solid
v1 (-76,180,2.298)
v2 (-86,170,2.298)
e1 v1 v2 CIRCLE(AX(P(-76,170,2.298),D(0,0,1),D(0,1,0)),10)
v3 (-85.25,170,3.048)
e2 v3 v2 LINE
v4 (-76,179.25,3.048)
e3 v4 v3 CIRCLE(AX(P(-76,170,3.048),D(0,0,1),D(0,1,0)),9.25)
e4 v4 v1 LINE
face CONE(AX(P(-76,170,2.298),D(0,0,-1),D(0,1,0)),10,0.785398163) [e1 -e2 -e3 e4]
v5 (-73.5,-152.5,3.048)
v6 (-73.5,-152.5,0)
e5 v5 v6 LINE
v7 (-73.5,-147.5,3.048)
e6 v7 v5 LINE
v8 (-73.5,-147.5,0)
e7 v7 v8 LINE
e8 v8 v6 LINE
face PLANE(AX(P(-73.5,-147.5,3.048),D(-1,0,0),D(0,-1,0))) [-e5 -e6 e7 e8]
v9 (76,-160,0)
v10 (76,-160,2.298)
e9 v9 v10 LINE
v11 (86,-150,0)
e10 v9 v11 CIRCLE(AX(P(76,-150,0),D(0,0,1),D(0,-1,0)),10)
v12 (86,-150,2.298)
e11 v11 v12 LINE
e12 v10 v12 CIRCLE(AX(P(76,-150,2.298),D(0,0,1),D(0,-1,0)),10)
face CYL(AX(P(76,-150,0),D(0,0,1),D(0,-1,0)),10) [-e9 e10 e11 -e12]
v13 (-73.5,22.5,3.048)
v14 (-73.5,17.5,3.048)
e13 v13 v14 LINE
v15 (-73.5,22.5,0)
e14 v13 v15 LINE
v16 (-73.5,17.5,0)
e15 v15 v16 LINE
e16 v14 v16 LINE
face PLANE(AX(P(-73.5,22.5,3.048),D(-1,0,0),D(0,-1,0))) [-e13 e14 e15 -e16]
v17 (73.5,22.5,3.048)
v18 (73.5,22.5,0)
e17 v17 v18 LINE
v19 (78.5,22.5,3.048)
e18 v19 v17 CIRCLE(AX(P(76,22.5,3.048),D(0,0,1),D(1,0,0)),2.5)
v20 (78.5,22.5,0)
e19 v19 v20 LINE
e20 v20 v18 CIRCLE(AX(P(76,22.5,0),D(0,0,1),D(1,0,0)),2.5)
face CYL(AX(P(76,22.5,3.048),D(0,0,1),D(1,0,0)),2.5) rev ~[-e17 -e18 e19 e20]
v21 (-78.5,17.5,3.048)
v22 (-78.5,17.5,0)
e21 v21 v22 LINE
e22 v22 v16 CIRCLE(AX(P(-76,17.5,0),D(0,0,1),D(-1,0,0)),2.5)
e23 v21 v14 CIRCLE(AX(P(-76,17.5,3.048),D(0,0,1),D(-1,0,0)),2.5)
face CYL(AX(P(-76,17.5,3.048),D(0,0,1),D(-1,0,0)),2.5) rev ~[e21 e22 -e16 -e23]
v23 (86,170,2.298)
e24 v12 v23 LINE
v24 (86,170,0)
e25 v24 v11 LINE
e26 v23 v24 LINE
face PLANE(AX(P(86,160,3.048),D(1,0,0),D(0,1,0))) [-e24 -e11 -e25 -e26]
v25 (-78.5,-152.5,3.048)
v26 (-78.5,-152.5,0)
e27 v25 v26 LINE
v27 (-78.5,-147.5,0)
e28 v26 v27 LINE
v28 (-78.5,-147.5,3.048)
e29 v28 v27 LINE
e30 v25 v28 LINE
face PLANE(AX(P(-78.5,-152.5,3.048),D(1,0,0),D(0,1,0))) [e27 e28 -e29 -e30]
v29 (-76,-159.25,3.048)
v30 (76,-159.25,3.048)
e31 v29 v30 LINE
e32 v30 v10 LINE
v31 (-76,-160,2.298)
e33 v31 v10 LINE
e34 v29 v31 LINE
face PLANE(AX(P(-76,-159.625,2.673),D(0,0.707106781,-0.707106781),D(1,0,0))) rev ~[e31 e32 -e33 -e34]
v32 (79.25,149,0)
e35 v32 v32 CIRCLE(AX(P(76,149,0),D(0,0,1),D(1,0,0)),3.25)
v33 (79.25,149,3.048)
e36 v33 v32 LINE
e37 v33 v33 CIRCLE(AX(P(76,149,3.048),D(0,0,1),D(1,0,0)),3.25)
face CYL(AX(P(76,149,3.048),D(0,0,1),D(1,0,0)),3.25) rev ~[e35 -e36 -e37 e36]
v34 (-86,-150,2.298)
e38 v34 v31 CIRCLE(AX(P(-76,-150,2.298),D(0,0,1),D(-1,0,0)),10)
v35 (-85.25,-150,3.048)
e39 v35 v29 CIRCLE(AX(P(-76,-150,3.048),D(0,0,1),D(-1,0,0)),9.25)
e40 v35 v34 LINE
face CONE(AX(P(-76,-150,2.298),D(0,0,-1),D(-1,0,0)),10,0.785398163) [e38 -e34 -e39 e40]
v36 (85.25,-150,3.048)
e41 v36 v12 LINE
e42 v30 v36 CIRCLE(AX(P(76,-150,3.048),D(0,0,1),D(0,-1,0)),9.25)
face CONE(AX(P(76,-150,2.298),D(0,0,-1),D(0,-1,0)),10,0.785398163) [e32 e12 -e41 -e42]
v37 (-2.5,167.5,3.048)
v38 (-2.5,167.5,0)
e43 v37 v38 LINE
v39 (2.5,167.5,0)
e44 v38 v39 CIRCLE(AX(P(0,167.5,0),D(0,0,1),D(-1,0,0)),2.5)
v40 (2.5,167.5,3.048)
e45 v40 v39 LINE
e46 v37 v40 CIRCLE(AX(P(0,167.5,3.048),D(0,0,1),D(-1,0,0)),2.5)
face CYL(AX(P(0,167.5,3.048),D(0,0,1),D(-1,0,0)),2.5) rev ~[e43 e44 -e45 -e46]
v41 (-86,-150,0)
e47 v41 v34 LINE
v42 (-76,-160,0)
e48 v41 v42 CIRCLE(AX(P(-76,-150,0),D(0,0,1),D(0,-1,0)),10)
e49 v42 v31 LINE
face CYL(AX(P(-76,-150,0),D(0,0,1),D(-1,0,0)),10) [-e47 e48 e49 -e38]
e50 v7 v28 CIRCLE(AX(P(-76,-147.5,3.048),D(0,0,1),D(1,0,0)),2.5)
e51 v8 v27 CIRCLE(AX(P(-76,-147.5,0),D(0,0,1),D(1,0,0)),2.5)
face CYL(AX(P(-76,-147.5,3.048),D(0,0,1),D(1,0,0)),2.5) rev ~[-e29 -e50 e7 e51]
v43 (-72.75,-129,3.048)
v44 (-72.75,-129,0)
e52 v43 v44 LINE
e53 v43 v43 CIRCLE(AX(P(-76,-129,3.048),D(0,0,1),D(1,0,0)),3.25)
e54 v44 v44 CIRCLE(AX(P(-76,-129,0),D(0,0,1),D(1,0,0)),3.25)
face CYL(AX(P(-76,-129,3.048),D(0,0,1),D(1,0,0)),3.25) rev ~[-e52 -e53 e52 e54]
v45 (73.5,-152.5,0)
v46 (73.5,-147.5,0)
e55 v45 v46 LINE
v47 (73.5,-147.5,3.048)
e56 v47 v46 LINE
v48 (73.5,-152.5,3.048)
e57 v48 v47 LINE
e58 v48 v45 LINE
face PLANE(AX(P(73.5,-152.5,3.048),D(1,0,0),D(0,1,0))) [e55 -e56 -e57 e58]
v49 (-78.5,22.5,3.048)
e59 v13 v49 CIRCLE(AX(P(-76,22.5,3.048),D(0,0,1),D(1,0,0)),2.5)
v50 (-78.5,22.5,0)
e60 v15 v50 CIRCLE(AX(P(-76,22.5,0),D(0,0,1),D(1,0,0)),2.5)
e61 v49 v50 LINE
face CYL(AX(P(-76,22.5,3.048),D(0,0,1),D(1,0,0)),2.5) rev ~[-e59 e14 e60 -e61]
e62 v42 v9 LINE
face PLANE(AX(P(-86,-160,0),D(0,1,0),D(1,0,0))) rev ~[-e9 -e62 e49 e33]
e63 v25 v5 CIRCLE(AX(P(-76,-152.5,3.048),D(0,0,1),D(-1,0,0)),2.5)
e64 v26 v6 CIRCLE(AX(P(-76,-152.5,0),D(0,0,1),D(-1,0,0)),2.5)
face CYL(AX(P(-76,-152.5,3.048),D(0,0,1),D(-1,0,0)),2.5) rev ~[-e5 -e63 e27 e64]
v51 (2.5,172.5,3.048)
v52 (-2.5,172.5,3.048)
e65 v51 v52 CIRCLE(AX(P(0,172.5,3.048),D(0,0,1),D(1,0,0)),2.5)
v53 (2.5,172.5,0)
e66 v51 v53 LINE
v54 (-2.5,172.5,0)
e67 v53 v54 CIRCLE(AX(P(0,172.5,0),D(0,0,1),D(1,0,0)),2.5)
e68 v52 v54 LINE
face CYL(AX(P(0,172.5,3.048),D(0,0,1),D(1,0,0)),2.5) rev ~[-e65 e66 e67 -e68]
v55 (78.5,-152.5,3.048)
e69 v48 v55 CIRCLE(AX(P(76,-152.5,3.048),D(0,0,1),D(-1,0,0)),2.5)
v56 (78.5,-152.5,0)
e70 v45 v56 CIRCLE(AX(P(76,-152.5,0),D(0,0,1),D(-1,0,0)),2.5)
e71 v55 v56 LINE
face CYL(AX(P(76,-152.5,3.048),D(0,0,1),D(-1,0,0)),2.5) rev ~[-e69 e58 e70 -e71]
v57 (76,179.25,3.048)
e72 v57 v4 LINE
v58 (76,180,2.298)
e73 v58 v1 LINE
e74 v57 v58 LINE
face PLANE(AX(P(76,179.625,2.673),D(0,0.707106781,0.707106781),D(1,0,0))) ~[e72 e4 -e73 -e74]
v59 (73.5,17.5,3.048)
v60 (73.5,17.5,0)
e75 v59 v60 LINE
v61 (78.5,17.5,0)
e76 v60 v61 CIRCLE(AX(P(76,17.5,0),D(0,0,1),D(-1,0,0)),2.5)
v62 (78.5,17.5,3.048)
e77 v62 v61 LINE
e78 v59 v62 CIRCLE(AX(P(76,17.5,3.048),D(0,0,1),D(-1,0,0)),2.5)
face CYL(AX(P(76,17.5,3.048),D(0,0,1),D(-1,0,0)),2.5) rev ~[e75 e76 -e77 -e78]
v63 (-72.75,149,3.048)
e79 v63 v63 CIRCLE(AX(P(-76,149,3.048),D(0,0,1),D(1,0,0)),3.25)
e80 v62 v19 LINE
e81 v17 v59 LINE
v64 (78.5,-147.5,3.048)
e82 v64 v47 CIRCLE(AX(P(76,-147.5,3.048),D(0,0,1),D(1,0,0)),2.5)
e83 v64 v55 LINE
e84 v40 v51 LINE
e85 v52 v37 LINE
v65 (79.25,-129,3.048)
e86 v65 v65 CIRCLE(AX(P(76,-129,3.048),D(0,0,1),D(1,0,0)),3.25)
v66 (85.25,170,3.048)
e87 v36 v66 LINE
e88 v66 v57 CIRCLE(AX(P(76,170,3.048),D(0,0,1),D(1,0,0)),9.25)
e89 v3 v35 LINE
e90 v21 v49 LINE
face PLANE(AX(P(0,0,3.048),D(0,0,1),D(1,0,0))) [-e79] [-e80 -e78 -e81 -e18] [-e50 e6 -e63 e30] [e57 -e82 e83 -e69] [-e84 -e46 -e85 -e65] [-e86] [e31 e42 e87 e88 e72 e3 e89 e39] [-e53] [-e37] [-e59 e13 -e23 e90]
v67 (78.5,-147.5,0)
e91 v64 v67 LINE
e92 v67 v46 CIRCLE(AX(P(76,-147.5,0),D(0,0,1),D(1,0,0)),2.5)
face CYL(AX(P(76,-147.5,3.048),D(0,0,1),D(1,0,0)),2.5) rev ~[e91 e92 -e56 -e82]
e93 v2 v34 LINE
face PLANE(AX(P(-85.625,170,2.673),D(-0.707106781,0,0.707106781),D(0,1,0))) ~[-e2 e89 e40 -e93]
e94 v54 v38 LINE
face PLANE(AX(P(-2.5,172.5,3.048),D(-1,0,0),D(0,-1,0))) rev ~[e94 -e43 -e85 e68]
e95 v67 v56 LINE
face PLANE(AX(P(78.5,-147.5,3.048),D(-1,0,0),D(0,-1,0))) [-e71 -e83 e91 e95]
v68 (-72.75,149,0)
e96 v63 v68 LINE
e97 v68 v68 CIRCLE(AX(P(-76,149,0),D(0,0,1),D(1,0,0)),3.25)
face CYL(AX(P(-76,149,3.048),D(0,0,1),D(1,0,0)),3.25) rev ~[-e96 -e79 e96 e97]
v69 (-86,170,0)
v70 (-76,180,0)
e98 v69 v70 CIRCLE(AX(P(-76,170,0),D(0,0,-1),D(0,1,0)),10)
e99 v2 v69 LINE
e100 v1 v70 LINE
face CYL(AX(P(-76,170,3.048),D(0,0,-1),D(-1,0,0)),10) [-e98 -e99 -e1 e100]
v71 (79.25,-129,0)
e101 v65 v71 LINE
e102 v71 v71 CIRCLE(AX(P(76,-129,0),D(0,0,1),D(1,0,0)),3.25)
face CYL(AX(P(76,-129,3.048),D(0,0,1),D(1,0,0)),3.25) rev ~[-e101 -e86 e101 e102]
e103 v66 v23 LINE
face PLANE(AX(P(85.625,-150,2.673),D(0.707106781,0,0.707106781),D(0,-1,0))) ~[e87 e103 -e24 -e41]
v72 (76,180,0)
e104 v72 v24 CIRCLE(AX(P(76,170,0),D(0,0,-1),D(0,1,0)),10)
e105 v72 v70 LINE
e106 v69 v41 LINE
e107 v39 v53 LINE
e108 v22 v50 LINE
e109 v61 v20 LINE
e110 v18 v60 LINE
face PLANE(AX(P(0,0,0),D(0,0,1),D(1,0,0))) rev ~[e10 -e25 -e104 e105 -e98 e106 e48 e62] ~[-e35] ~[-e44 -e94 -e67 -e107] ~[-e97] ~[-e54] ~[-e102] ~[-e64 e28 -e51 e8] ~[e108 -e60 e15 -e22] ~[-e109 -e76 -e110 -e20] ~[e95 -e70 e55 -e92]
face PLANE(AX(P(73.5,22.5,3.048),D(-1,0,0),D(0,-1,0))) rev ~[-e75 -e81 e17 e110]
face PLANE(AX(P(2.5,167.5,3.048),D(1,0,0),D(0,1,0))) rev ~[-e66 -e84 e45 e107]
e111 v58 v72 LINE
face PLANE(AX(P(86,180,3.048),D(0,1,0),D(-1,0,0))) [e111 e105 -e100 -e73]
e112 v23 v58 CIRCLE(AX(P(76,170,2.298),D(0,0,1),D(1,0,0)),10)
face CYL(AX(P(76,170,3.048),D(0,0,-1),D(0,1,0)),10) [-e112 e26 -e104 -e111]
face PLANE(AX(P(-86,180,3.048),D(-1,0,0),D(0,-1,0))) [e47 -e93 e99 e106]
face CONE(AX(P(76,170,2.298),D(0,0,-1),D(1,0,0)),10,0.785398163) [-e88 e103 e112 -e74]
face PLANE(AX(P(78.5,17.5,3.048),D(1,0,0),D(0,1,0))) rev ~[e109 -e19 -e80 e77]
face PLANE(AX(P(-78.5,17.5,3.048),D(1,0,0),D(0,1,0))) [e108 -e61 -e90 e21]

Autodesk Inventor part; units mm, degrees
ref_plane "YZ Plane" through (0, 0, 0) normal (1, 0, 0) x (0, 1, 0)
ref_plane "XZ Plane" through (0, 0, 0) normal (0, 1, 0) x (-1, 0, 0)
sketch "Sketch1" plane through (0, 0, 0) normal (0, 0, 1) x (1, 0, 0)
  line L0 (-86, -160) -> (86, -160)
  line L1 (86, -160) -> (86, 160)
  line L2 (86, 160) -> (-86, 160)
  line L3 (-86, 160) -> (-86, -160)
  line L4 (-86, -160) -> (86, 160) construction
  line L5 (86, -160) -> (-86, 160) construction
  point P0 (0, 0)
  dimension "d0" = 320
  dimension "d1" = 172
extrude "Plate1" add sketch "Sketch1" along normal blind 3.048
sketch "Sketch2" plane through (0, 0, 3.048) normal (0, 0, 1) x (1, 0, 0)
  circle A0 centre (-76, 149) radius 3.25
  line L0 (0, 144.4317) -> (0, -177.0748)
  line L1 (-144.6038, 10) -> (151.531, 10)
  circle A1 centre (76, 149) radius 3.25
  circle A2 centre (-76, -129) radius 3.25
  circle A3 centre (76, -129) radius 3.25
  point P0 (0, 0)
  dimension "d3" = 0
  dimension "d4" = 10
  dimension "d5" = 6.5
  dimension "d6" = 76
  dimension "d7" = 139
extrude "Cut1" cut sketch "Sketch2" against normal blind 3.048
sketch "Sketch3" plane through (0, 0, 3.048) normal (0, 0, 1) x (1, 0, 0)
  line L0 (-76, -152.5) -> (-76, -147.5) construction
  line L1 (-78.5, -152.5) -> (-78.5, -147.5)
  line L2 (-73.5, -147.5) -> (-73.5, -152.5)
  arc A0 (-78.5, -152.5) -> (-73.5, -152.5) centre (-76, -152.5) ccw
  arc A1 (-73.5, -147.5) -> (-78.5, -147.5) centre (-76, -147.5) ccw
  line L3 (76, -152.5) -> (76, -147.5) construction
  line L4 (73.5, -152.5) -> (73.5, -147.5)
  line L5 (78.5, -147.5) -> (78.5, -152.5)
  arc A2 (73.5, -152.5) -> (78.5, -152.5) centre (76, -152.5) ccw
  arc A3 (78.5, -147.5) -> (73.5, -147.5) centre (76, -147.5) ccw
  line L6 (-23.5, 120) -> (-28.5, 120) construction
  line L7 (-23.5, 122.5) -> (-28.5, 122.5) construction
  line L8 (-28.5, 117.5) -> (-23.5, 117.5) construction
  arc A4 (-23.5, 117.5) -> (-23.5, 122.5) centre (-23.5, 120) ccw construction
  arc A5 (-28.5, 122.5) -> (-28.5, 117.5) centre (-28.5, 120) ccw construction
  line L9 (76, 17.5) -> (76, 22.5) construction
  line L10 (78.5, 17.5) -> (78.5, 22.5)
  line L11 (73.5, 22.5) -> (73.5, 17.5)
  arc A6 (73.5, 17.5) -> (78.5, 17.5) centre (76, 17.5) ccw
  arc A7 (78.5, 22.5) -> (73.5, 22.5) centre (76, 22.5) ccw
  line L12 (86, -160) -> (-86, -160) projected
  line L13 (-86, 160) -> (86, 160) projected
  line L14 (-86, -160) -> (-86, 160) projected
  line L15 (-76, 17.5) -> (-76, 22.5) construction
  line L16 (-78.5, 17.5) -> (-78.5, 22.5)
  line L17 (-73.5, 22.5) -> (-73.5, 17.5)
  arc A8 (-78.5, 17.5) -> (-73.5, 17.5) centre (-76, 17.5) ccw
  arc A9 (-73.5, 22.5) -> (-78.5, 22.5) centre (-76, 22.5) ccw
  line L18 (86, 160) -> (86, -160) projected
  point P0 (0, 0)
  point P1 (-76, -150)
  point P2 (76, -150)
  point P3 (-26, 120)
  point P4 (76, 20)
  point P5 (-76, 20)
  dimension "d12" = 10
  dimension "d13" = 10
  dimension "d14" = 170
  dimension "d16" = 40
  dimension "d17" = 0
  dimension "d18" = 60
  dimension "d19" = 170
  dimension "d20" = 0
  dimension "d21" = 5
  dimension "d22" = 5
  dimension "d23" = 5
  dimension "d24" = 5
  dimension "d25" = 5
  dimension "d26" = 2.5
  dimension "d27" = 2.5
  dimension "d28" = 2.5
  dimension "d29" = 2.5
  dimension "d30" = 2.5
  dimension "d33" = 10
  dimension "d34" = 10
extrude "Cut2" cut sketch "Sketch3" against normal blind 3.048 contours L1 A1 L2 A0 | L4 A3 L5 A2 | A6 L11 A7 L10 | L16 A9 L17 A8
ref_plane "Work Plane1" through (86, 160, 0) normal (0, 0.9659258, -0.258819) x (-1, 0, 0)
fillet "Fillet1" radius 10 2 edges at (-86, -160, 1.524) (86, -160, 1.524)
sketch "Sketch7" plane through (0, 0, 3.048) normal (0, 0, 1) x (1, 0, 0)
  line L0 (86, 160) -> (-86, 160)
  line L1 (-86, 160) -> (86, 160)
  line L2 (86, 160) -> (86, 180)
  line L3 (86, 180) -> (-86, 180)
  line L4 (-86, 180) -> (-86, 160)
  point P0 (0, 0)
  dimension "d50" = 20
sheet face with bend "Face4" sketch "Sketch7" thickness 3.048 toward (0, 0, -1) bend radius 3.048
bend "Bend3"
sketch "Sketch8" plane through (0, 0, 3.048) normal (0, 0, 1) x (1, 0, 0)
  line L0 (0, 167.5) -> (0, 172.5) construction
  line L1 (2.5, 167.5) -> (2.5, 172.5)
  line L2 (-2.5, 172.5) -> (-2.5, 167.5)
  arc A0 (-2.5, 167.5) -> (2.5, 167.5) centre (0, 167.5) ccw
  arc A1 (2.5, 172.5) -> (-2.5, 172.5) centre (0, 172.5) ccw
  line L3 (86, 180) -> (-86, 180) projected
  line L4 (86, 180) -> (86, -150) projected
  line L5 (-86, 180) -> (-86, -150) projected
  point P0 (0, 0)
  point P1 (0, 170)
  dimension "d56" = 2.5
  dimension "d57" = 5
  dimension "d58" = 10
  dimension "d59" = 172
  dimension "d60" = 86
extrude "Cut3" cut sketch "Sketch8" against normal blind 3.048
fillet "Corner Round1" radius 10 2 edges at (86, 180, 1.524) (-86, 180, 1.524)
chamfer "Chamfer1" distance 0.75 angle 45 8 edges at (0, -160, 3.048) (-83.0711, -157.0711, 3.048) (-86, 10, 3.048) (-83.0711, 177.0711, 3.048) (0, 180, 3.048) (83.0711, 177.0711, 3.048) (86, 10, 3.048) (83.0711, -157.0711, 3.048)
equation "\"d12\" = d11"
equation "\"d13\" = d11"
equation "\"d22\" = d21"
equation "\"d23\" = d21"
equation "\"d24\" = d21"
equation "\"d25\" = d21"
equation "\"d27\" = d26"
equation "\"d28\" = d26"
equation "\"d29\" = d28"
equation "\"d30\" = d28"
equation "\"d60\" = 0.5 * d59"
equation "\"BendRadius\" = Thickness"
equation "\"BendReliefWidth\" = Thickness"
equation "\"BendReliefDepth\" = 0.5 * Thickness"
equation "\"CornerReliefSize\" = 4 * Thickness"
equation "\"MinimumRemnant\" = 2 * Thickness"
equation "\"TransitionRadius\" = BendRadius"
equation "\"JacobiRadiusSize\" = BendRadius"
equation "\"GapSize\" = Thickness"
equation "\"d11\" = 10"
properties part number "CCU_Fix"
